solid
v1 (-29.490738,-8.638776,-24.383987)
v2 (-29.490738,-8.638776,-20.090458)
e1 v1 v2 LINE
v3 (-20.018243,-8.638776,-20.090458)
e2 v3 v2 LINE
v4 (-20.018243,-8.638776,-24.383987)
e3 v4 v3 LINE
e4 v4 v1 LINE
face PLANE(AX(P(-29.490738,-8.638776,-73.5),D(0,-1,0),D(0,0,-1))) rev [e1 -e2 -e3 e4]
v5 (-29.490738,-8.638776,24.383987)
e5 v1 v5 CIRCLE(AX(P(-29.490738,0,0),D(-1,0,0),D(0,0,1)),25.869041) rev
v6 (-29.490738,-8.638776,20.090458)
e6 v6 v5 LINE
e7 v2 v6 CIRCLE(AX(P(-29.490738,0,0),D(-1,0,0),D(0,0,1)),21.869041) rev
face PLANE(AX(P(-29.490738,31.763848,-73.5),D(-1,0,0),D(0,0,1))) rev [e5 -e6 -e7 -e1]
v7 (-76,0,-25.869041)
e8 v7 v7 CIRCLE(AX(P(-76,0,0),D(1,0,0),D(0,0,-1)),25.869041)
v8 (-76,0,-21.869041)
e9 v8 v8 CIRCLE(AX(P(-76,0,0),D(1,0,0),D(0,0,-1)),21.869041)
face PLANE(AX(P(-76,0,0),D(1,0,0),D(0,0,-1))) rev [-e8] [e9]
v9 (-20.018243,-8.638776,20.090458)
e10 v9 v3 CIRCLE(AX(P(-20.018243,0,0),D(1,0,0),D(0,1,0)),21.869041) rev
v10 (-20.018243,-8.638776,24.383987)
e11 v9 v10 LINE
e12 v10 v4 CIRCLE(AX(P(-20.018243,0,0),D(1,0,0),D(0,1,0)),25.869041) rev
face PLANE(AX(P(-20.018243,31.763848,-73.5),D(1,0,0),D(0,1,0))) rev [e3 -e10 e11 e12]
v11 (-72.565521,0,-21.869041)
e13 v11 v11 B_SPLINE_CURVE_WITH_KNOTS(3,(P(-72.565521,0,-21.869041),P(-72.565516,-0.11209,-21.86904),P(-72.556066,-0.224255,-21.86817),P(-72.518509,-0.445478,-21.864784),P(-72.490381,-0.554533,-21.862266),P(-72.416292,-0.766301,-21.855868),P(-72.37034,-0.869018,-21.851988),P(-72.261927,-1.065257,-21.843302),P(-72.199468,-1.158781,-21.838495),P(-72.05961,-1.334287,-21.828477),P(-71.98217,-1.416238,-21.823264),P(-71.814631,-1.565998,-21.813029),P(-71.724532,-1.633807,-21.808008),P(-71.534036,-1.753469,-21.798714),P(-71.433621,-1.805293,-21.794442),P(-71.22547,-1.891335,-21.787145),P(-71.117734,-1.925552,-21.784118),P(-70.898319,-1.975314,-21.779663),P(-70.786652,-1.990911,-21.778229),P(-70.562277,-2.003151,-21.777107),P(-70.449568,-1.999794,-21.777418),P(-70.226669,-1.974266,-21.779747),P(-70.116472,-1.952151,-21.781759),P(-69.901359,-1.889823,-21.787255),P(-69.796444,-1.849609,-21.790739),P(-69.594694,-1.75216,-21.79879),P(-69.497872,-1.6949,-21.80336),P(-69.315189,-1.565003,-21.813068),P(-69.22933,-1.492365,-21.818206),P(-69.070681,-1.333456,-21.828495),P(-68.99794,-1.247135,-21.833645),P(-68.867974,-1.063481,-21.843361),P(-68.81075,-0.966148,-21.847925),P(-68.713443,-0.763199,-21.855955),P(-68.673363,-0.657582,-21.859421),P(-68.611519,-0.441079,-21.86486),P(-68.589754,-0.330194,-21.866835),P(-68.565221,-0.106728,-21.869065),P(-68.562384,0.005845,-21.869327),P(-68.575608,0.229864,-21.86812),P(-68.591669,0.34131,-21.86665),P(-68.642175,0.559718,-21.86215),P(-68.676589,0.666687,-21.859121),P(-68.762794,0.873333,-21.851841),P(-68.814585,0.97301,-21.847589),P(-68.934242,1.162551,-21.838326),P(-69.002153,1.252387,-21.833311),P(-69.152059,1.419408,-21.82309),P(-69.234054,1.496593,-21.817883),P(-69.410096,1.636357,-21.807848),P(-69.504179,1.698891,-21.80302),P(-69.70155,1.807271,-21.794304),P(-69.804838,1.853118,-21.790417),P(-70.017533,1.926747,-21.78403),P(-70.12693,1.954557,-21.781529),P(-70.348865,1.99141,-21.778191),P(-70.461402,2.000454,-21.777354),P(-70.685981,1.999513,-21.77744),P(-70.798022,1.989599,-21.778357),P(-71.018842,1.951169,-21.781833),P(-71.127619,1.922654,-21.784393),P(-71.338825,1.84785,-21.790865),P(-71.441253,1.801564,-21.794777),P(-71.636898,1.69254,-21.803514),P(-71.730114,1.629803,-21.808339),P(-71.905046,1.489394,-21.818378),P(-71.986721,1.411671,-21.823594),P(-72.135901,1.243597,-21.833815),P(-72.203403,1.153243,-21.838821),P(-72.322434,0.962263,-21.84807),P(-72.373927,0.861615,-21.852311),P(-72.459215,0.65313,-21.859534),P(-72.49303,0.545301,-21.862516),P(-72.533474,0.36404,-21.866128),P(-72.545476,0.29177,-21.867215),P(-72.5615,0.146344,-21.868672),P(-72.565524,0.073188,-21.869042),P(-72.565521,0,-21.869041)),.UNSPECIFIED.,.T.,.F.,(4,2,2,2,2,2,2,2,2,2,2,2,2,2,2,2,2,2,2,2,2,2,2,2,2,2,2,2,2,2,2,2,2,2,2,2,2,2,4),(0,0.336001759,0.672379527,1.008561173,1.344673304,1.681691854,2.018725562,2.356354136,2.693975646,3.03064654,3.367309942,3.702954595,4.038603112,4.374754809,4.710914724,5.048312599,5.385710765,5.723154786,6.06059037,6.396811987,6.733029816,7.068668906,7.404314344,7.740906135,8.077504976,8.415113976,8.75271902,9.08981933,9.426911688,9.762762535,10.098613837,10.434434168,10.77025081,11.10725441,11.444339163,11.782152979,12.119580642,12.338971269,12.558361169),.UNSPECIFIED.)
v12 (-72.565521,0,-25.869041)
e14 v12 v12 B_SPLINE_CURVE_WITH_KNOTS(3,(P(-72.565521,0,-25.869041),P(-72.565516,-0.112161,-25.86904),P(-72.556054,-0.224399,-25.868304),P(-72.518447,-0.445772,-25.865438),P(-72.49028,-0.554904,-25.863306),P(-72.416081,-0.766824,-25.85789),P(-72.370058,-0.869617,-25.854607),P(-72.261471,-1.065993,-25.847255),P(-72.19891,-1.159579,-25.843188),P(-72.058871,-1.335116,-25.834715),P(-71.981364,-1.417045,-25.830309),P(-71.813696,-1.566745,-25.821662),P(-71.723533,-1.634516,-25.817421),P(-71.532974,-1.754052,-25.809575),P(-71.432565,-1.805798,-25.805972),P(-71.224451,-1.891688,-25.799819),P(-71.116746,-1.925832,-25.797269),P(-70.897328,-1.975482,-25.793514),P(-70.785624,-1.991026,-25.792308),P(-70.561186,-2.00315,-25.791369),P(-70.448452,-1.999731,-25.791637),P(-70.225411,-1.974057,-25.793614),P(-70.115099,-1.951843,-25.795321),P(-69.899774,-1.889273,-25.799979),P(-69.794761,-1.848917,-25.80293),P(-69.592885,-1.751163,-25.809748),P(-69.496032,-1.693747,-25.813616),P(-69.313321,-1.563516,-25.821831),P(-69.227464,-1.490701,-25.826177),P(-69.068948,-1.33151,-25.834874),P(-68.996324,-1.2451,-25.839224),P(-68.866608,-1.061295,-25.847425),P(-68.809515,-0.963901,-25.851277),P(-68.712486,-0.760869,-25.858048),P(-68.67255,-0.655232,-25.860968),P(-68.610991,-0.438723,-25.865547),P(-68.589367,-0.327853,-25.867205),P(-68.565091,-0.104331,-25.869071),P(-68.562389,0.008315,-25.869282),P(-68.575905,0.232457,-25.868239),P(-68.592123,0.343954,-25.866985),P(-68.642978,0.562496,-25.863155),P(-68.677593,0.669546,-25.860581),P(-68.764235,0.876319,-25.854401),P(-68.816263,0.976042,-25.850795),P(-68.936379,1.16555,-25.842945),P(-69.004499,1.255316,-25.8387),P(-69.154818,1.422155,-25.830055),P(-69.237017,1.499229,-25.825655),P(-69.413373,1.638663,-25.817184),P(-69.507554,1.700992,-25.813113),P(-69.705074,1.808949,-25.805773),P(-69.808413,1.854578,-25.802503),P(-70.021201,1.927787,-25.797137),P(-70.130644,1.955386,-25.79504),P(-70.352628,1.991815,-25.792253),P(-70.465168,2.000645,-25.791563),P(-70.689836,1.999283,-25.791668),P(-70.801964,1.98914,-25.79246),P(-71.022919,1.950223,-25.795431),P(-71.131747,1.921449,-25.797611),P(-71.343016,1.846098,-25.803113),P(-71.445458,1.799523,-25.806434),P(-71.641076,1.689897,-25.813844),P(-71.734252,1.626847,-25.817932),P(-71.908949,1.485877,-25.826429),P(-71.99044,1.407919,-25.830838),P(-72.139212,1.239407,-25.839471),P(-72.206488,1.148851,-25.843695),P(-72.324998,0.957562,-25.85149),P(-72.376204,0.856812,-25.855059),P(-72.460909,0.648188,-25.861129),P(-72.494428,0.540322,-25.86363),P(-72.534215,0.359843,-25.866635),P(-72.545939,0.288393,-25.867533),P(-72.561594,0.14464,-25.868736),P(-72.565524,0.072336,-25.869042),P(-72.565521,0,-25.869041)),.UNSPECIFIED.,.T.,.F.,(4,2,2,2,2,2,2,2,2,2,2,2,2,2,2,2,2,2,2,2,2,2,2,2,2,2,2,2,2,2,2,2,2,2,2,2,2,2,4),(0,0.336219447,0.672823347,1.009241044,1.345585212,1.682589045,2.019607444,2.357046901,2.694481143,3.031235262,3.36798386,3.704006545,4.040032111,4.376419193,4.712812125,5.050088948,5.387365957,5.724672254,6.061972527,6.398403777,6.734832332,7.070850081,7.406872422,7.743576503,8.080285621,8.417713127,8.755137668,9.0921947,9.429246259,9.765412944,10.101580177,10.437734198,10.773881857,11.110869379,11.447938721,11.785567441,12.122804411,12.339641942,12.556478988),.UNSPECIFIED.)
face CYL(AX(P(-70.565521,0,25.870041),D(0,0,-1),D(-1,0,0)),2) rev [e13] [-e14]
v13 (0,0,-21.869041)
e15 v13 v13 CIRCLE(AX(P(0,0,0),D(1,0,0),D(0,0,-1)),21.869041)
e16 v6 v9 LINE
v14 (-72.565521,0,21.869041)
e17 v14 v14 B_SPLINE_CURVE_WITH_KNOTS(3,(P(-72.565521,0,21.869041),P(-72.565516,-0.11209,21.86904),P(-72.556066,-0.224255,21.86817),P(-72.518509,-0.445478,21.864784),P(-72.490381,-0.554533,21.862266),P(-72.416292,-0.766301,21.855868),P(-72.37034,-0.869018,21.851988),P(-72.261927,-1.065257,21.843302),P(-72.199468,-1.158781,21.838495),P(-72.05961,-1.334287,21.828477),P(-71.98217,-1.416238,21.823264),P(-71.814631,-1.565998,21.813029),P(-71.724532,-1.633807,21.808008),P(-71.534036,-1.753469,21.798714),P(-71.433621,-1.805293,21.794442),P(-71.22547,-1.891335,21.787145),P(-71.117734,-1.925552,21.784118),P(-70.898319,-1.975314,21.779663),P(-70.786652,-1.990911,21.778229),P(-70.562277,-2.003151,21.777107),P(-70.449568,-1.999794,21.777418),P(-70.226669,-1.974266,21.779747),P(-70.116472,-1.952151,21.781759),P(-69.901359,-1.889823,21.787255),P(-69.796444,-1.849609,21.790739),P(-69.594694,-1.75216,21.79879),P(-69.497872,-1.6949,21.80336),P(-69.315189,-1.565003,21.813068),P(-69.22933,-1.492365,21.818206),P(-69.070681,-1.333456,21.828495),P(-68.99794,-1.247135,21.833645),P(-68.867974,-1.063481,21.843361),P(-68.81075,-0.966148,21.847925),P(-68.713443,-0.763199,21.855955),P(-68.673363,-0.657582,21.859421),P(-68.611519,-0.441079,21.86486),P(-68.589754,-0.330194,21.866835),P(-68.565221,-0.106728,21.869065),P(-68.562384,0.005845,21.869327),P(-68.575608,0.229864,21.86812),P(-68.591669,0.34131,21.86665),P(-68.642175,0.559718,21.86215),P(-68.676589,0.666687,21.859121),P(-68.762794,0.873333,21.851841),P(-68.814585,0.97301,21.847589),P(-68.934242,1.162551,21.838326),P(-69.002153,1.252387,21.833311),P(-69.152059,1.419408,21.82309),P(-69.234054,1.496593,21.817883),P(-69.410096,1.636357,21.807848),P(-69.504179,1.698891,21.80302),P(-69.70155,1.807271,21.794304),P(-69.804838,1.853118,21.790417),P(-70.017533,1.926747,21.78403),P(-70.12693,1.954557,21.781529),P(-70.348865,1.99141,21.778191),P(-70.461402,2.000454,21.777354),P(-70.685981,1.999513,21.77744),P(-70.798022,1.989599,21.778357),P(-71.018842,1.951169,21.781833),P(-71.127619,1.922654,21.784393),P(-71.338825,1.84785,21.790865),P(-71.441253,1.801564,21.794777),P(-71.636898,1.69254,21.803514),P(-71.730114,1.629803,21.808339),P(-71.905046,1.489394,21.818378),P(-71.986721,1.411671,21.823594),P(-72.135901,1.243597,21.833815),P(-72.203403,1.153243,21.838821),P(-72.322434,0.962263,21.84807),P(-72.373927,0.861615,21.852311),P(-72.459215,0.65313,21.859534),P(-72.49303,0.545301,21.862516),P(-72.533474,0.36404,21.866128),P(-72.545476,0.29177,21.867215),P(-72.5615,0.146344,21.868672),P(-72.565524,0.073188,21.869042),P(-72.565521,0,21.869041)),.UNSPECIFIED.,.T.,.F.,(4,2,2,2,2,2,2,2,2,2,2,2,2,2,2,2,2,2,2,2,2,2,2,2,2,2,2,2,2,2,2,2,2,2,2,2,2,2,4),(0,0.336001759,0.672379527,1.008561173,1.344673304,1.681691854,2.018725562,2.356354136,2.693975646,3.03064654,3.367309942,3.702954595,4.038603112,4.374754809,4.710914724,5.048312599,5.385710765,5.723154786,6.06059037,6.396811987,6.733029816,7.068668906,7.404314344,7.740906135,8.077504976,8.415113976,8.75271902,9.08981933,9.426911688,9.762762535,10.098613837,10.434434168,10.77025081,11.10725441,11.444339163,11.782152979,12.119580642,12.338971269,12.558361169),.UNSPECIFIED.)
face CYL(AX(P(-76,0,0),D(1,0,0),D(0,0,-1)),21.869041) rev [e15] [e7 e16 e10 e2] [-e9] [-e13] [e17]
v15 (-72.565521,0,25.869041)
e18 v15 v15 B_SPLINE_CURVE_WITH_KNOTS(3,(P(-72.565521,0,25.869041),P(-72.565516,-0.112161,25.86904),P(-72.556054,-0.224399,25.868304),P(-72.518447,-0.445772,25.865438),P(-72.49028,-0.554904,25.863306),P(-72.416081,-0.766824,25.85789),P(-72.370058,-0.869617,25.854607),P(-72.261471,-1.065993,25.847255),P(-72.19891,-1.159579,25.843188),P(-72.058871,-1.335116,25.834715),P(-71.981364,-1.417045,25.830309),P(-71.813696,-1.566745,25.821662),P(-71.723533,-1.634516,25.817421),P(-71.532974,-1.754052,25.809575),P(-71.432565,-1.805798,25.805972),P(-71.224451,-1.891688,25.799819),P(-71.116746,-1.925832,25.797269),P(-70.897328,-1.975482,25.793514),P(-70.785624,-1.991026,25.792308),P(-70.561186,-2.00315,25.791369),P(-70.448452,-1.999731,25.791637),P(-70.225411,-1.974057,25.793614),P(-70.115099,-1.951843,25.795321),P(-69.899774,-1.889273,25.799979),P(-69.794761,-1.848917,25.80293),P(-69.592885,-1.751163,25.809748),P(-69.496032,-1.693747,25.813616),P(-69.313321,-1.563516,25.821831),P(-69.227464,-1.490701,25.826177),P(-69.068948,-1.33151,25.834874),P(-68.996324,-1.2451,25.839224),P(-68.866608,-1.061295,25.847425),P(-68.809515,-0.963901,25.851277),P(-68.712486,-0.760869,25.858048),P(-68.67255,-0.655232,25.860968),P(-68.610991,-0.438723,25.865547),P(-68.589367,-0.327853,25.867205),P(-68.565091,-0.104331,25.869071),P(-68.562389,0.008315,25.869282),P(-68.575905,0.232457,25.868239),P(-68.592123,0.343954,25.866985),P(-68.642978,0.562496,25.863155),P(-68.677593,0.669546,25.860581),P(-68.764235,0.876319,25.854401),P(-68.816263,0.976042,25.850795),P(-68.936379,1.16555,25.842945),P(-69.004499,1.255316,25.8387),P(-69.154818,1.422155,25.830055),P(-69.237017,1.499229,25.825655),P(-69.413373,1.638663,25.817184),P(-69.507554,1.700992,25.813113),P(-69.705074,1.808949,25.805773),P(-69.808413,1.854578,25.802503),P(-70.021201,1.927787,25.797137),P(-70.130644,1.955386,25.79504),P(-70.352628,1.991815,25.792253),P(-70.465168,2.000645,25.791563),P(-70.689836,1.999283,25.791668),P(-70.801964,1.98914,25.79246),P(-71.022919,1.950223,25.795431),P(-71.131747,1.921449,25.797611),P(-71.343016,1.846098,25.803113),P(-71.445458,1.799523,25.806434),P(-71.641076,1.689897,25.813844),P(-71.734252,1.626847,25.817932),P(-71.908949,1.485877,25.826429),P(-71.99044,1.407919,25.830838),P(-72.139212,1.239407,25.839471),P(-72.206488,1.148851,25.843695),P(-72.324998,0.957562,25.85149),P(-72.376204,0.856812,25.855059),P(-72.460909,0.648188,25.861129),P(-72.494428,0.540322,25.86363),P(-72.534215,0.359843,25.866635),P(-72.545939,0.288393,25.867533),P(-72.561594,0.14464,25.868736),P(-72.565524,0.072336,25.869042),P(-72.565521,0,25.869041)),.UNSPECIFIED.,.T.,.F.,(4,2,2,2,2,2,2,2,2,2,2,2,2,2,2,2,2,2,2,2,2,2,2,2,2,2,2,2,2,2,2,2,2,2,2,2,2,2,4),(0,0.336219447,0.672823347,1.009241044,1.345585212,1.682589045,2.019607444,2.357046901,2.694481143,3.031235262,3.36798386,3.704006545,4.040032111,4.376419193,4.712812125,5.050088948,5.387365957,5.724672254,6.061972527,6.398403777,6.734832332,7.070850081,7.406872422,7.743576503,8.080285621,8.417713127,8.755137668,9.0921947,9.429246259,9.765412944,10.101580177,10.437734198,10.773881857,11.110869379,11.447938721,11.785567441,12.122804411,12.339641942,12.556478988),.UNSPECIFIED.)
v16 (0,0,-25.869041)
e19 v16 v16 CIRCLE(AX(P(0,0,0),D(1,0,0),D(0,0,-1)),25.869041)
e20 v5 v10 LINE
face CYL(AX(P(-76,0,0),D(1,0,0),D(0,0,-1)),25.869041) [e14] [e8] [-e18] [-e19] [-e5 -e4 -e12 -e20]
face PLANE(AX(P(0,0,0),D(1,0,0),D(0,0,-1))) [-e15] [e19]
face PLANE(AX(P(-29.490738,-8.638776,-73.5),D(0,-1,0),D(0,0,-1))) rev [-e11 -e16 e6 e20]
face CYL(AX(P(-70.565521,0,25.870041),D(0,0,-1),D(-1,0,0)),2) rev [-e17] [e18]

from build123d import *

# Parameters (mm, degrees)
SKETCH1_R               = 25.869040911
SKETCH1_R_2             = 21.869040911
BOSS_EXTRUDE1_DEPTH     = 76
SKETCH2_W               = 9.472494485
SKETCH2_H               = 40.402624636
CUT_EXTRUDE1_DEPTH      = 73.5
CUT_EXTRUDE2_REACH      = 97.509
CUT_EXTRUDE2_END_RADIUS = 21.869040911
SKETCH3_R               = 2
MIRROR1_START           = 21.777395316
MIRROR1_OUTLINE_R       = 2
MIRROR1_DEPTH           = 4.091645695


# Read off the part's stored shape, not the designer's step: Mirror1
with BuildPart() as part:
    # Sketch1 → Boss-Extrude1 (new body)
    with BuildSketch(Plane(origin=(0, 0, 0), x_dir=(0, 0, -1), z_dir=(1, 0, 0))):
        Circle(SKETCH1_R)
        Circle(SKETCH1_R_2, mode=Mode.SUBTRACT)
    extrude(amount=-BOSS_EXTRUDE1_DEPTH)

    # Sketch2 → Cut-Extrude1 (cut, symmetric)
    with BuildSketch(Plane.XY):
        with Locations((-24.754490459, 11.562535947)):
            Rectangle(SKETCH2_W, SKETCH2_H)
    extrude(amount=CUT_EXTRUDE1_DEPTH, both=True, mode=Mode.SUBTRACT)

    # Cut-Extrude2: up to this cylinder (the profile starts outside it)
    cut_extrude2_end = Plane(origin=(-70.565521, 0, 0), z_dir=(1, 0, 0)) * Cylinder(CUT_EXTRUDE2_END_RADIUS, 239.756081822, mode=Mode.PRIVATE)
    # Sketch3 → Cut-Extrude2 (cut, up to the surface)
    with BuildSketch(Plane(origin=(0, 0, -25.869040911), x_dir=(-1, 0, 0), z_dir=(0, 0, -1)), mode=Mode.PRIVATE) as cut_extrude2_sk1:
        with Locations((70.565520642, 0)):
            Circle(SKETCH3_R)
    cut_extrude2_tool1 = extrude(cut_extrude2_sk1.sketch, amount=-CUT_EXTRUDE2_REACH, mode=Mode.PRIVATE) - cut_extrude2_end
    add(cut_extrude2_tool1.solids().sort_by_distance((-70.565521, 0, -25.869041))[0], mode=Mode.SUBTRACT)

    # Mirror1 outline → Mirror1 (cut)
    with BuildSketch(Plane.XY.offset(MIRROR1_START)):
        with Locations((-70.565520642, 0)):
            Circle(MIRROR1_OUTLINE_R)
    extrude(amount=MIRROR1_DEPTH, mode=Mode.SUBTRACT)


solid = part.part
